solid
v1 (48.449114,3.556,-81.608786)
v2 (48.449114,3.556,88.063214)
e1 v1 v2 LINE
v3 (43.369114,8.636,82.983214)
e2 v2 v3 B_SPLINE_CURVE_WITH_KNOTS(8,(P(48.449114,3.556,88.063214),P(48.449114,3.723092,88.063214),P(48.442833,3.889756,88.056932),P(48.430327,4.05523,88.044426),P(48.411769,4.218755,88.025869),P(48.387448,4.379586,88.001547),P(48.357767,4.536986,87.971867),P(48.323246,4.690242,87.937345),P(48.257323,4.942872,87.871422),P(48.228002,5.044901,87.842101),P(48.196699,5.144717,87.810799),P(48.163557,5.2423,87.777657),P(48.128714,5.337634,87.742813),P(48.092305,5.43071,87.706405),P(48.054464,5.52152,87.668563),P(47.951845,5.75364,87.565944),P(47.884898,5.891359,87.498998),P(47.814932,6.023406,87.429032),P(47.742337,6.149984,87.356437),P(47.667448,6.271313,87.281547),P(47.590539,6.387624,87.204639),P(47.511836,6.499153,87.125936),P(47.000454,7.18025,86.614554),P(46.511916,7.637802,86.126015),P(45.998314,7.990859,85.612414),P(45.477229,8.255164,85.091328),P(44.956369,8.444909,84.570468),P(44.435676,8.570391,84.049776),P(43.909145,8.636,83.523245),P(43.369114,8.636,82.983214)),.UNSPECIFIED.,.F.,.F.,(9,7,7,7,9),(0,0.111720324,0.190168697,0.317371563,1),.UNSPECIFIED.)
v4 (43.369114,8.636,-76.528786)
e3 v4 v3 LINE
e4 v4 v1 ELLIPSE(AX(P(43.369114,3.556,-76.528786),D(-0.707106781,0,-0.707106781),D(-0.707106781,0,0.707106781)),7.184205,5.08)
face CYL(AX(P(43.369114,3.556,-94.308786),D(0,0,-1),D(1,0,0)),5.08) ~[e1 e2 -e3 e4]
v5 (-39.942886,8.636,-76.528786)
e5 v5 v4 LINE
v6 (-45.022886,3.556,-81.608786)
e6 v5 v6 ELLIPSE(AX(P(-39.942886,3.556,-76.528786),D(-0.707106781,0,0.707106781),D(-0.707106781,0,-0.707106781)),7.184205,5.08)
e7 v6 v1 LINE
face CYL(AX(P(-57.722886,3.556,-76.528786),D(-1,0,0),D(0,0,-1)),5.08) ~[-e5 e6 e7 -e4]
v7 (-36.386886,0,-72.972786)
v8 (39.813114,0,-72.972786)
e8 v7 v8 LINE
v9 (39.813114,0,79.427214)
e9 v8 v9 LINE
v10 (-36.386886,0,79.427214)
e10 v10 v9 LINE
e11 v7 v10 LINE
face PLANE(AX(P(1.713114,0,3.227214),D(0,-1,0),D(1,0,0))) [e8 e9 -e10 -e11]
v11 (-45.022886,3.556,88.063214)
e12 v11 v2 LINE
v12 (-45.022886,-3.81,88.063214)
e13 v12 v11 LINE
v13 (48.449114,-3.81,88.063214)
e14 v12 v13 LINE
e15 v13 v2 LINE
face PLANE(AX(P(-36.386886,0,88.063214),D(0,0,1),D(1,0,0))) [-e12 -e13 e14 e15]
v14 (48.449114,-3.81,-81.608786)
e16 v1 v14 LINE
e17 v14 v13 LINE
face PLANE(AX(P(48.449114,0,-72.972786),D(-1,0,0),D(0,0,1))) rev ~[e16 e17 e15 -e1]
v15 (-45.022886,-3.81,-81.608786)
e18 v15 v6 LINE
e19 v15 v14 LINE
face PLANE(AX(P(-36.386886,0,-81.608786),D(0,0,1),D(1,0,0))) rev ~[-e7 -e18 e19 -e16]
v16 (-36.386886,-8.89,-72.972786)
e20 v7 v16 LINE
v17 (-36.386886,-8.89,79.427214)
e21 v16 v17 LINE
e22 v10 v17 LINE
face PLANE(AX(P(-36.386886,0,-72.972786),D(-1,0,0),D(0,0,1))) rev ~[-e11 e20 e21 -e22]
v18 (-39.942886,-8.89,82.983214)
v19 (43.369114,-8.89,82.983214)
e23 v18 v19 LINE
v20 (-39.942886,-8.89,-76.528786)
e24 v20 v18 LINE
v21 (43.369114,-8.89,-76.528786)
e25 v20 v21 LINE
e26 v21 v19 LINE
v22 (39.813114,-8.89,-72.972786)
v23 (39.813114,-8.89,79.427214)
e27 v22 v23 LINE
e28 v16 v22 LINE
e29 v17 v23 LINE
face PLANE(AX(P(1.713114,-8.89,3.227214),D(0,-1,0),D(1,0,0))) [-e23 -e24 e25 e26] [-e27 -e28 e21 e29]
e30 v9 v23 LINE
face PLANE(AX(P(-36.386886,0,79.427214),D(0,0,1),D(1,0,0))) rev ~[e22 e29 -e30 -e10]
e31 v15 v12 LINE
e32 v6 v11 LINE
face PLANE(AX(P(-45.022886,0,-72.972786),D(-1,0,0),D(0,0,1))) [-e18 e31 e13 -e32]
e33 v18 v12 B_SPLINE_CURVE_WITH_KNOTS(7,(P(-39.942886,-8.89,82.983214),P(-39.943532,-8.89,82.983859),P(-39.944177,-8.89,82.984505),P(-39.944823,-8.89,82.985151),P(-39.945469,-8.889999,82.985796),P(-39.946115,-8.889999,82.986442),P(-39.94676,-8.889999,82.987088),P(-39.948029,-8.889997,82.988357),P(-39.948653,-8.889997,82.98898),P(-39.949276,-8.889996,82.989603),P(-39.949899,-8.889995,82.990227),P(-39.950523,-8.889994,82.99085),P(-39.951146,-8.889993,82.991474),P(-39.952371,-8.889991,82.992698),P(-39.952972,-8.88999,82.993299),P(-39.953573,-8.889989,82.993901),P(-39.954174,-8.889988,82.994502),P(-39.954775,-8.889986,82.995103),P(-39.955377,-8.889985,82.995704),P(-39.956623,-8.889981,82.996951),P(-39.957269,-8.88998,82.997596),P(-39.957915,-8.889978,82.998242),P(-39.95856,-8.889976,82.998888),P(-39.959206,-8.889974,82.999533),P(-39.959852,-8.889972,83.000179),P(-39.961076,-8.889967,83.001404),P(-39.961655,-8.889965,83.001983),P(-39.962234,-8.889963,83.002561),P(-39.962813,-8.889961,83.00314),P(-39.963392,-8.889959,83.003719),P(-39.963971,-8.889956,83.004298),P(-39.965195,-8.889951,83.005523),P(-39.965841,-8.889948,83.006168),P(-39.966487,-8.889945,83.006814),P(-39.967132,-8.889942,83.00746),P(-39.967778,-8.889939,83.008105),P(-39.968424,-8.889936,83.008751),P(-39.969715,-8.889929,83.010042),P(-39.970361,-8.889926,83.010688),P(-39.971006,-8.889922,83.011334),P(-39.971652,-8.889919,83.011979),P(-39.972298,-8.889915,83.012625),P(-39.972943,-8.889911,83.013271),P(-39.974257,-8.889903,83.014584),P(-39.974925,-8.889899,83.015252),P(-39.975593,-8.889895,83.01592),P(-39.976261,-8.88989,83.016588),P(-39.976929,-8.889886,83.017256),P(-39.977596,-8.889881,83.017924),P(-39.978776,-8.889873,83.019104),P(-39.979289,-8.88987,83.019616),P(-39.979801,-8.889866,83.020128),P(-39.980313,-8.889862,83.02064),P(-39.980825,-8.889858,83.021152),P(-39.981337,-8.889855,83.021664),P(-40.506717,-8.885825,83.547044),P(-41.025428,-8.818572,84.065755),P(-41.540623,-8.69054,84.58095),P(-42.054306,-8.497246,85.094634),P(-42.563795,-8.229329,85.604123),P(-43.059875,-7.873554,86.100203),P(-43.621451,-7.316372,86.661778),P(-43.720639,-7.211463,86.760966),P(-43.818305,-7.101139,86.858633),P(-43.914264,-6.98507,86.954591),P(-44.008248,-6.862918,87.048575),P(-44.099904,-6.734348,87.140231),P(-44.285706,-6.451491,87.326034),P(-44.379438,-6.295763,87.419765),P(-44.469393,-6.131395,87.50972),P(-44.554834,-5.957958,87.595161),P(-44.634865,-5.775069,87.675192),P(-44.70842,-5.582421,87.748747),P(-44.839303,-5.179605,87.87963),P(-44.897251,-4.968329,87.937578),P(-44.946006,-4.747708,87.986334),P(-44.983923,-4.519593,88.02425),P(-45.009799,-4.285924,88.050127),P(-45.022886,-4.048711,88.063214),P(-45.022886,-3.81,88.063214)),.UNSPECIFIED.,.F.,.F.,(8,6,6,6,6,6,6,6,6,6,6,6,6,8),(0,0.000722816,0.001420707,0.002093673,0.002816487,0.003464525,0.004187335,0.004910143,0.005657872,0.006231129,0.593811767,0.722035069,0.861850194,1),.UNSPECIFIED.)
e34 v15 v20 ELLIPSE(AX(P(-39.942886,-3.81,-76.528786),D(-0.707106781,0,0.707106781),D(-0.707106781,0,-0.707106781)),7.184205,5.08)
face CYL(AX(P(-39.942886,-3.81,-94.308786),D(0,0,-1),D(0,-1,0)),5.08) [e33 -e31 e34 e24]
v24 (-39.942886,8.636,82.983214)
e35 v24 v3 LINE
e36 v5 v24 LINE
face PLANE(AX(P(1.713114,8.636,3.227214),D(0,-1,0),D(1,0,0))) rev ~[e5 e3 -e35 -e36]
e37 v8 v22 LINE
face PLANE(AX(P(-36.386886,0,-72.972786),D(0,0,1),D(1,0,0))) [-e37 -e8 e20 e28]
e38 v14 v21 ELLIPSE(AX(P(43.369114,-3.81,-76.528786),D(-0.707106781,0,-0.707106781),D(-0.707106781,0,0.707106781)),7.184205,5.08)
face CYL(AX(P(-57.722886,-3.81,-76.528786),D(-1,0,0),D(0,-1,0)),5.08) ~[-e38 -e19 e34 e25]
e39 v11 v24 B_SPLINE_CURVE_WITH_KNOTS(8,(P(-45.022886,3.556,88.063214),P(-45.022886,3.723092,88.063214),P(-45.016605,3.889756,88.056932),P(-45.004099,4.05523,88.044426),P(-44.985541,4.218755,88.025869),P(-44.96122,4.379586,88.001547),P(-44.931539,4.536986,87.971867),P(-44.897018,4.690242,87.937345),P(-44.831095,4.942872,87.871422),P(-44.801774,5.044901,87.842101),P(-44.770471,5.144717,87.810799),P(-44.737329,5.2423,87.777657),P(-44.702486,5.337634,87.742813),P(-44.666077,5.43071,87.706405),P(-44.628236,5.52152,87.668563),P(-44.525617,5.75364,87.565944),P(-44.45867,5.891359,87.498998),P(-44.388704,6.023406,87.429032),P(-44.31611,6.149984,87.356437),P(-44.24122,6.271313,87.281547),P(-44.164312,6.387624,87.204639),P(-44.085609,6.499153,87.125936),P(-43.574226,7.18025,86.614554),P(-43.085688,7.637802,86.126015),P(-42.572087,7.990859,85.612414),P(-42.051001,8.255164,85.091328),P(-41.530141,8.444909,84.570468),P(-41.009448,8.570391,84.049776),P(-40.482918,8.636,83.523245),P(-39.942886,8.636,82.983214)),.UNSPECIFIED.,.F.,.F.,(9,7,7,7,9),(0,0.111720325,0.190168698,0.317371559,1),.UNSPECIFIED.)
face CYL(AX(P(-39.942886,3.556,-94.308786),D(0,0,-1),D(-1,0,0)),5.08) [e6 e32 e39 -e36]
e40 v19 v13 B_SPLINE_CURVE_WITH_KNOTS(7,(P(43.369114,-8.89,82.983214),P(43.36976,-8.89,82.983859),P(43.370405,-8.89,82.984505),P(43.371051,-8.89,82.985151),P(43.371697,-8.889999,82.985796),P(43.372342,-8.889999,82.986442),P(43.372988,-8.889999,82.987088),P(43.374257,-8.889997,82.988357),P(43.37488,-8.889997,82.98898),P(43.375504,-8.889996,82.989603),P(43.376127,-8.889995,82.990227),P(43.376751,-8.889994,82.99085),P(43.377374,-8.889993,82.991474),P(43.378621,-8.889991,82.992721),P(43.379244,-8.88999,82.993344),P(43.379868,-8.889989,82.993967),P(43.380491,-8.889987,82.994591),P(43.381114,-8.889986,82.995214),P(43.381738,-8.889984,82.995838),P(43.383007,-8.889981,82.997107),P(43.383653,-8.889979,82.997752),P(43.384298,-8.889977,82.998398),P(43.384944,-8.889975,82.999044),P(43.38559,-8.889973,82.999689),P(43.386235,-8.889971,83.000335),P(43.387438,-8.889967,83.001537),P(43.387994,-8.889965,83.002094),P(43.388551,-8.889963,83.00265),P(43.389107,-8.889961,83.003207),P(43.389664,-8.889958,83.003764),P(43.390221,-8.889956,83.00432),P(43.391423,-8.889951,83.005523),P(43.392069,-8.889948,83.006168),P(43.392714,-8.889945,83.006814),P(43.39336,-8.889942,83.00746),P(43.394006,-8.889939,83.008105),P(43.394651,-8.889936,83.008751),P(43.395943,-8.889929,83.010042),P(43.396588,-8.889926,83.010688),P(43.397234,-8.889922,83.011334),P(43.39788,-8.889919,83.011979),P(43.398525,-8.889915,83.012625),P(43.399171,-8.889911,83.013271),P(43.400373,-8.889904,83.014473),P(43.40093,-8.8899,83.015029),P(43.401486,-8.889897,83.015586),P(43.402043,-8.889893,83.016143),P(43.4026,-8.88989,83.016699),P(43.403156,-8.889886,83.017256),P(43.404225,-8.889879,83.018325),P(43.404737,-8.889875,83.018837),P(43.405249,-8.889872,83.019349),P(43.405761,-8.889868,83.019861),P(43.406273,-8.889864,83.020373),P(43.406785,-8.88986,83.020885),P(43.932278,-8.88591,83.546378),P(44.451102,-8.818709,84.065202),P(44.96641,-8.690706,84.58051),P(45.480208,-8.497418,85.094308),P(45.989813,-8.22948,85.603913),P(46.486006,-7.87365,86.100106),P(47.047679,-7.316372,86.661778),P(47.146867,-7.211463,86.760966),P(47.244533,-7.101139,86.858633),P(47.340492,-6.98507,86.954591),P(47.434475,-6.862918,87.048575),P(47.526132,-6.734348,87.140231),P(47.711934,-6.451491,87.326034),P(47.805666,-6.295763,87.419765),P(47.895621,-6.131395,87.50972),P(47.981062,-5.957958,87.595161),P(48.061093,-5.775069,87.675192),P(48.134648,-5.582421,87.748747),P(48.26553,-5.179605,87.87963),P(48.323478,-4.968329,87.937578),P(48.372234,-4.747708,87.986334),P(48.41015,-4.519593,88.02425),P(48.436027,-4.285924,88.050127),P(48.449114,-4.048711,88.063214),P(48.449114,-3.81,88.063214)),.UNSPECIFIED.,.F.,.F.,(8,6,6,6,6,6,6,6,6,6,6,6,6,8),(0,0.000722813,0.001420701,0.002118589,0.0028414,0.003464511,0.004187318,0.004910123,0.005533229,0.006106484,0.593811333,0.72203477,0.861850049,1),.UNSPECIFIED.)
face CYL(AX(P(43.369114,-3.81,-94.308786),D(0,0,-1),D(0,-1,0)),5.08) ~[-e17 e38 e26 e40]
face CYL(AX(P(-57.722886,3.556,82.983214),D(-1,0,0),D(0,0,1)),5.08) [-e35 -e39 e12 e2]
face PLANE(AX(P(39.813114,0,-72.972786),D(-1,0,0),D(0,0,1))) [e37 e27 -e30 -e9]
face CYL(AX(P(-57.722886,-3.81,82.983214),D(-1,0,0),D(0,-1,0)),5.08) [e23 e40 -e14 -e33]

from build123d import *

# Parameters (mm, degrees)
F0_W        = 76.2
F0_H        = 152.4
F1_DEPTH    = 8.89
F2_T        = 8.636
F3_T1_DEPTH = 118.872
F3_T3_DEPTH = 195.072


# Not quite as in the source:
# - a fillet or chamfer that OpenCascade refuses, or shapes differently, is made with other operations: its cross-section is extruded or revolved along the edge and cut away or added


with BuildPart() as f1:
    # F0 (on Front) → F1 (new body)
    with BuildSketch(Plane.XZ):
        with Locations((1.7131138593, 3.2272135141)):
            Rectangle(F0_W, F0_H)
    extrude(amount=F1_DEPTH)

    # F2
    f2_openings = [f1.faces().sort_by_distance(p)[0] for p in [
        (1.713114, -8.89, 3.227214),
    ]]
    offset(amount=F2_T, openings=f2_openings, kind=Kind.INTERSECTION)

    # F3: fillet of radius 5.08 on 8 edges, made by hand

    # F3_s2 → F3_t1 (cut)
    with BuildSketch(Plane.YZ.offset(-57.7228861407)):
        with BuildLine():
            ThreePointArc((-8.89, -76.5287864859), (-7.4021024484, -80.1208889343), (-3.81, -81.6087864859))
            Line((-3.81, -81.6087864859), (-8.89, -81.6087864859))
            Line((-8.89, -81.6087864859), (-8.89, -76.5287864859))
        make_face()
        with BuildLine():
            ThreePointArc((-8.89, 82.9832135141), (-7.4021024484, 86.5753159626), (-3.81, 88.0632135141))
            Line((-3.81, 88.0632135141), (-8.89, 88.0632135141))
            Line((-8.89, 88.0632135141), (-8.89, 82.9832135141))
        make_face()
        with BuildLine():
            ThreePointArc((3.556, 88.0632135141), (7.1481024484, 86.5753159626), (8.636, 82.9832135141))
            Line((8.636, 82.9832135141), (8.636, 88.0632135141))
            Line((8.636, 88.0632135141), (3.556, 88.0632135141))
        make_face()
        with BuildLine():
            ThreePointArc((3.556, -81.6087864859), (7.1481024484, -80.1208889343), (8.636, -76.5287864859))
            Line((8.636, -76.5287864859), (8.636, -81.6087864859))
            Line((8.636, -81.6087864859), (3.556, -81.6087864859))
        make_face()
    extrude(amount=F3_T1_DEPTH, mode=Mode.SUBTRACT)

    # F3_s4 → F3_t3 (cut)
    with BuildSketch(Plane.XY.offset(-94.3087864859)):
        with BuildLine():
            ThreePointArc((43.3691138593, -8.89), (46.9612163077, -7.4021024484), (48.4491138593, -3.81))
            Line((48.4491138593, -3.81), (48.4491138593, -8.89))
            Line((48.4491138593, -8.89), (43.3691138593, -8.89))
        make_face()
        with BuildLine():
            ThreePointArc((-39.9428861407, -8.89), (-43.5349885891, -7.4021024484), (-45.0228861407, -3.81))
            Line((-45.0228861407, -3.81), (-45.0228861407, -8.89))
            Line((-45.0228861407, -8.89), (-39.9428861407, -8.89))
        make_face()
        with BuildLine():
            ThreePointArc((-45.0228861407, 3.556), (-43.5349885891, 7.1481024484), (-39.9428861407, 8.636))
            Line((-39.9428861407, 8.636), (-45.0228861407, 8.636))
            Line((-45.0228861407, 8.636), (-45.0228861407, 3.556))
        make_face()
        with BuildLine():
            ThreePointArc((48.4491138593, 3.556), (46.9612163077, 7.1481024484), (43.3691138593, 8.636))
            Line((43.3691138593, 8.636), (48.4491138593, 8.636))
            Line((48.4491138593, 8.636), (48.4491138593, 3.556))
        make_face()
    extrude(amount=F3_T3_DEPTH, mode=Mode.SUBTRACT)


solid = f1.part
